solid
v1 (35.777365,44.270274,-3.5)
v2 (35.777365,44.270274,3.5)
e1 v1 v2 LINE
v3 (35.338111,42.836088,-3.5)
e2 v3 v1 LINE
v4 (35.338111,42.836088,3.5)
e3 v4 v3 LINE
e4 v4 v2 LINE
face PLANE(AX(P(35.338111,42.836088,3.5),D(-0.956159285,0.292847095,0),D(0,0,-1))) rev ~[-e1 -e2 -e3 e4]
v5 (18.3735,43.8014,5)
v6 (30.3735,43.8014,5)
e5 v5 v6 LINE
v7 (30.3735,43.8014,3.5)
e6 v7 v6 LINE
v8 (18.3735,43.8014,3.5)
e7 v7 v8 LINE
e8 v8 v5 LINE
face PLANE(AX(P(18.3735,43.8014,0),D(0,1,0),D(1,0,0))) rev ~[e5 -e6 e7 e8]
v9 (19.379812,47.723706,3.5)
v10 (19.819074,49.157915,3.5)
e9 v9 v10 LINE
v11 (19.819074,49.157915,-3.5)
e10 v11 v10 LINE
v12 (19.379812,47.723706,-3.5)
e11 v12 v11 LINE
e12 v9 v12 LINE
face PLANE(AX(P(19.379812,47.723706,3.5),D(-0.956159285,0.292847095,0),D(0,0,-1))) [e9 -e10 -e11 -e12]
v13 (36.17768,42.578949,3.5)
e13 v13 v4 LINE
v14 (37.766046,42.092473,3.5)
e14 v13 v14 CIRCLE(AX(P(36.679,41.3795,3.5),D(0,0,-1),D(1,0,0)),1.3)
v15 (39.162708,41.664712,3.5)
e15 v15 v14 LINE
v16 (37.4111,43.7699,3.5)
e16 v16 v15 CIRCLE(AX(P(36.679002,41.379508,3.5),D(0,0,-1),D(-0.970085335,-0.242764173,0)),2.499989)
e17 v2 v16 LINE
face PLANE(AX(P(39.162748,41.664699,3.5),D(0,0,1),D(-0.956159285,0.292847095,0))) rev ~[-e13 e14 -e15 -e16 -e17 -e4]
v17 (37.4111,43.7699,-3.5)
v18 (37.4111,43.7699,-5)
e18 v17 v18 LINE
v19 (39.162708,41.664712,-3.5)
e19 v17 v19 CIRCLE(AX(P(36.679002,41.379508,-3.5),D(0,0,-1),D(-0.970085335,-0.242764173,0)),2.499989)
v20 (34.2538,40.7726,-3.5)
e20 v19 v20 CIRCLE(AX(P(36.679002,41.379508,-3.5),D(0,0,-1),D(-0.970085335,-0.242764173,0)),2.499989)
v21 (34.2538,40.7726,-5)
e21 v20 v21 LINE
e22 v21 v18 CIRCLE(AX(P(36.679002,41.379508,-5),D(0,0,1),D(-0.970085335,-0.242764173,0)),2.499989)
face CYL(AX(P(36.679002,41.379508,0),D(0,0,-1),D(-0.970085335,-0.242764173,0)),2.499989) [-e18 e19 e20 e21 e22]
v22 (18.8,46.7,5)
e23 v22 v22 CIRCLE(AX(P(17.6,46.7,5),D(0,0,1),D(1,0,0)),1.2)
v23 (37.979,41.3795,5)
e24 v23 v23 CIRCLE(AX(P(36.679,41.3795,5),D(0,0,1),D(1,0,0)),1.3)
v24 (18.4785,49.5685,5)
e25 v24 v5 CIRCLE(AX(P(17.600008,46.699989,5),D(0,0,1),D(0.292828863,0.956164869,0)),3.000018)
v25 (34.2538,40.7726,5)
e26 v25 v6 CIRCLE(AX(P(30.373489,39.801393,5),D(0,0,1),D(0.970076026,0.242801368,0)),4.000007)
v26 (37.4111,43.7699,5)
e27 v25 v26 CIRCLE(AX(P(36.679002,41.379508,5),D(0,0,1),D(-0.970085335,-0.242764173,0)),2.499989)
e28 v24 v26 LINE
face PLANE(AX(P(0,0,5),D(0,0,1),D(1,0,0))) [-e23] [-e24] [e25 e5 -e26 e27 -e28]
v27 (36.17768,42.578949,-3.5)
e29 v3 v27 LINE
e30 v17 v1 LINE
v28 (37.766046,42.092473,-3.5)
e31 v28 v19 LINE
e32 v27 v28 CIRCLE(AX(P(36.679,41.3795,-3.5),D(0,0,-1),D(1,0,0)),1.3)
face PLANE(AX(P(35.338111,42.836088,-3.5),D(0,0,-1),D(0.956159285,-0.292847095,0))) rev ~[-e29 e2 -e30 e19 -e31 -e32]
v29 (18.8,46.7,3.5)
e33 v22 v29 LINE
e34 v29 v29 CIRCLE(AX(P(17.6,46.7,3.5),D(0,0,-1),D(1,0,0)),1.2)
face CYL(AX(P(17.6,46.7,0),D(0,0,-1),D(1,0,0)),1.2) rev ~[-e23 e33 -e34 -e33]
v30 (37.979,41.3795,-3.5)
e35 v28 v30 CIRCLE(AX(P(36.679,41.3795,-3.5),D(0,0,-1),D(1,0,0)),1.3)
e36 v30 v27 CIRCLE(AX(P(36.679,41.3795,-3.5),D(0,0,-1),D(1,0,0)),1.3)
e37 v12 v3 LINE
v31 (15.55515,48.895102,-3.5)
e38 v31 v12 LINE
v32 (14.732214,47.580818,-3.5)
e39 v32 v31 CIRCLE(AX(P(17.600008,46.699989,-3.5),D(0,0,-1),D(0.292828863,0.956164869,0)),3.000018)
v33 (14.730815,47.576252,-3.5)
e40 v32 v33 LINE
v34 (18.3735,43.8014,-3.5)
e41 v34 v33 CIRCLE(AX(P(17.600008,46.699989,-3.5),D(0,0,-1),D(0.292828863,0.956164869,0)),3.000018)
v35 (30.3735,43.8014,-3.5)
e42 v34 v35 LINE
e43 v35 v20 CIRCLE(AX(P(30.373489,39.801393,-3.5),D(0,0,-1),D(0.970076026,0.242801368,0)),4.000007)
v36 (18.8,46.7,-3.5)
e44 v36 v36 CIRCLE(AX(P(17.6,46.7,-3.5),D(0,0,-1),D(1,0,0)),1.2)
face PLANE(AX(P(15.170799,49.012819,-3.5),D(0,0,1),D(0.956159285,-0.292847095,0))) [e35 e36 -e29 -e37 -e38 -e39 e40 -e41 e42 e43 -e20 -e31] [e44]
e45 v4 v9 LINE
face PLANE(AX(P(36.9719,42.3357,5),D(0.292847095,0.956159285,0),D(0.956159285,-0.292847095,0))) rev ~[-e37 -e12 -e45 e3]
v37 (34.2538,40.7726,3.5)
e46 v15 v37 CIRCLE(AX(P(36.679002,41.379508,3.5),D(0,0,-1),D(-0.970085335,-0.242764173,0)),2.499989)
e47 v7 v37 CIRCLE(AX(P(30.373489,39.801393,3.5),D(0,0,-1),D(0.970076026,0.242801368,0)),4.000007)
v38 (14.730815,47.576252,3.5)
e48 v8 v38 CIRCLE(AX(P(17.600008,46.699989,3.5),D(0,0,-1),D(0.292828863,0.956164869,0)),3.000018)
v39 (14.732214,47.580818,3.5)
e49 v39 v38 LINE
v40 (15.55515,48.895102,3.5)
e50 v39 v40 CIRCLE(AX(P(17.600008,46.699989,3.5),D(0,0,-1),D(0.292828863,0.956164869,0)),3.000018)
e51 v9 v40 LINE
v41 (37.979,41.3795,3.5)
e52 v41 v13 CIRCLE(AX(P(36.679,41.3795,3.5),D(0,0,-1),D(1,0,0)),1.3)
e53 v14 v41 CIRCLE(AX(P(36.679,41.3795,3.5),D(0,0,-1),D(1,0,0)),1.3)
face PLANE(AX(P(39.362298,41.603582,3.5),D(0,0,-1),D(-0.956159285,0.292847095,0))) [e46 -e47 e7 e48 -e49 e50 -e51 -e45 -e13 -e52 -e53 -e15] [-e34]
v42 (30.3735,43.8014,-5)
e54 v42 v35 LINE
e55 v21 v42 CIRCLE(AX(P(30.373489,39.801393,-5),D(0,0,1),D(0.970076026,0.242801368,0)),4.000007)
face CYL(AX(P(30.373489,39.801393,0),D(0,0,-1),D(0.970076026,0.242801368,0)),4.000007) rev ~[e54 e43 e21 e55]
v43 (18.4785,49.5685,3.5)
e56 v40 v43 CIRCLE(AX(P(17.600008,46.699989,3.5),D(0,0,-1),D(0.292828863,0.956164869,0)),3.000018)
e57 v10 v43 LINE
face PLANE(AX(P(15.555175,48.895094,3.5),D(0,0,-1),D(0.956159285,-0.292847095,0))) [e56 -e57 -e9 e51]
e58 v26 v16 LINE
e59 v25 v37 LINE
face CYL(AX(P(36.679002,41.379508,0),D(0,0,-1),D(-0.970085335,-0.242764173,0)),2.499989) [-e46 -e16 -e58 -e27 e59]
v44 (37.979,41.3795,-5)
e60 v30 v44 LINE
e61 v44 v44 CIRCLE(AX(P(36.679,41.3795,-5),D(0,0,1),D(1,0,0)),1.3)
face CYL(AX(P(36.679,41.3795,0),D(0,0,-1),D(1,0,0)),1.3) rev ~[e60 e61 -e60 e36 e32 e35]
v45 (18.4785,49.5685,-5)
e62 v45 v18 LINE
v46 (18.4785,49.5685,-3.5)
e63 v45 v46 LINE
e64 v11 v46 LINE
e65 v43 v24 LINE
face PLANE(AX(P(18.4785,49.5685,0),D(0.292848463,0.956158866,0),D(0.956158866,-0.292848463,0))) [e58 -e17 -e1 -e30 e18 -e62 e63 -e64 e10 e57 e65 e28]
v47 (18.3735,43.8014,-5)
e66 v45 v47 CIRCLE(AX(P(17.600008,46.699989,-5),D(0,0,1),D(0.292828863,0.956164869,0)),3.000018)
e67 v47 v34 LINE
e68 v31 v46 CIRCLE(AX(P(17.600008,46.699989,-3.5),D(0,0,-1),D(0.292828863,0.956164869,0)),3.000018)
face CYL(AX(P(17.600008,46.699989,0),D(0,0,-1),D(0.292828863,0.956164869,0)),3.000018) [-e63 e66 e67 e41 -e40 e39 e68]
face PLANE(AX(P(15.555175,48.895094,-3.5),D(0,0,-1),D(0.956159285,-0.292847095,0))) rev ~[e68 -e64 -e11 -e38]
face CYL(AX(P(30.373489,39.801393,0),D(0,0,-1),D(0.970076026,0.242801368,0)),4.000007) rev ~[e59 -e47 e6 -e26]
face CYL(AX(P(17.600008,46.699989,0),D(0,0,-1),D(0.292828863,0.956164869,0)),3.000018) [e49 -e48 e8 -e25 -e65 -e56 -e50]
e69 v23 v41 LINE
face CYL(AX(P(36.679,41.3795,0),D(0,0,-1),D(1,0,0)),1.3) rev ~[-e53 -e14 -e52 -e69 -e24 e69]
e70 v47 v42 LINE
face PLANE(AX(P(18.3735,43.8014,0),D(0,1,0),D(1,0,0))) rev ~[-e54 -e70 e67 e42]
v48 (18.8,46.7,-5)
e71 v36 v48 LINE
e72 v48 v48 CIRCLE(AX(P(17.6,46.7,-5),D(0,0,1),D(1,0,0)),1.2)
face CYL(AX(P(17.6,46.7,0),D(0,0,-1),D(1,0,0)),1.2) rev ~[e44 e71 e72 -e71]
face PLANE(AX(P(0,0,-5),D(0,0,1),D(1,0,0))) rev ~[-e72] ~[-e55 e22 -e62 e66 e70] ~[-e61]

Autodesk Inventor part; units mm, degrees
ref_plane "YZ Plane" through (0, 0, 0) normal (1, 0, 0) x (0, 1, 0)
ref_plane "XZ Plane" through (0, 0, 0) normal (0, 1, 0) x (-1, 0, 0)
sketch "Sketch1" plane through (0, 0, 0) normal (0, 0, 1) x (1, 0, 0)
  circle A0 centre (17.6, 46.7) radius 1.2
  circle A1 centre (36.679, 41.3795) radius 1.3
  arc A2 (18.4785, 49.5685) -> (18.3735, 43.8014) centre (17.6, 46.7) ccw
  arc A3 (34.2538, 40.7726) -> (37.4111, 43.7699) centre (36.679, 41.3795) ccw
  line L0 (18.4785, 49.5685) -> (37.4111, 43.7699)
  line L1 (18.3735, 43.8014) -> (30.3735, 43.8014)
  arc A4 (34.2538, 40.7726) -> (30.3735, 43.8014) centre (30.3735, 39.8014) ccw
  circle A5 centre (36.679, 41.3795) radius 1.2
  point P0 (0, 0)
  dimension "d0" = 5
  dimension "d1" = 3
  dimension "d3" = 4
  dimension "d14" = 12
  dimension "d15" = 2.6
extrude "Extrusion1" add sketch "Sketch1" along normal mid plane 10 contours L0 A3 A4 L1 A2
ref_plane "Work Plane1" through (36.9719, 42.3357, 5) normal (0.2928471, 0.9561593, 0) x (0.9561593, -0.2928471, 0)
sketch "Sketch2" plane through (36.9719, 42.3357, 5) normal (0.2928471, 0.9561593, 0) x (0.9561593, -0.2928471, 0)
  line L0 (8.6668, 5) -> (-28.9168, 5) projected
  line L1 (-22.8007, 8.5) -> (2.5, 8.5)
  line L2 (2.5, 8.5) -> (2.5, 1.5)
  line L3 (2.5, 1.5) -> (-22.8007, 1.5)
  line L4 (-22.8007, 1.5) -> (-22.8007, 8.5)
  line L5 (2.5, 10) -> (2.5, 0) projected
  line L6 (-22.8007, 10) -> (-22.8007, 0) projected
  point P0 (-22.9531, 5)
  dimension "d7" = 7
extrude "Extrusion2" cut sketch "Sketch2" against normal through all
sketch "Sketch3" plane through (36.9719, 42.3357, 5) normal (-0.2928471, -0.9561593, 0) x (0.9561593, -0.2928471, 0)
  line L0 (-22.3987, -8.5) -> (-22.3987, -1.5) projected
  line L1 (-22.3987, -8.5) -> (2.2913, -8.5) projected
  line L2 (2.2913, -1.5) -> (2.2913, -8.5) projected
  line L3 (-22.3987, -1.5) -> (-18.3987, -1.5)
  line L4 (-18.3987, -1.5) -> (-18.3987, -8.5)
  line L5 (-18.3987, -8.5) -> (-22.3987, -8.5)
  line L6 (-22.3987, -8.5) -> (-22.3987, -1.5)
  line L7 (2.2913, -1.5) -> (-1.7087, -1.5)
  line L8 (-1.7087, -1.5) -> (-1.7087, -8.5)
  line L9 (-1.7087, -8.5) -> (2.2913, -8.5)
  line L10 (2.2913, -8.5) -> (2.2913, -1.5)
  point P0 (-22.9531, -5)
  dimension "d10" = 4
  dimension "d11" = 4
extrude "Extrusion3" cut sketch "Sketch3" against normal through all
properties part number "Lever for overlay hinge" material "Steel"
